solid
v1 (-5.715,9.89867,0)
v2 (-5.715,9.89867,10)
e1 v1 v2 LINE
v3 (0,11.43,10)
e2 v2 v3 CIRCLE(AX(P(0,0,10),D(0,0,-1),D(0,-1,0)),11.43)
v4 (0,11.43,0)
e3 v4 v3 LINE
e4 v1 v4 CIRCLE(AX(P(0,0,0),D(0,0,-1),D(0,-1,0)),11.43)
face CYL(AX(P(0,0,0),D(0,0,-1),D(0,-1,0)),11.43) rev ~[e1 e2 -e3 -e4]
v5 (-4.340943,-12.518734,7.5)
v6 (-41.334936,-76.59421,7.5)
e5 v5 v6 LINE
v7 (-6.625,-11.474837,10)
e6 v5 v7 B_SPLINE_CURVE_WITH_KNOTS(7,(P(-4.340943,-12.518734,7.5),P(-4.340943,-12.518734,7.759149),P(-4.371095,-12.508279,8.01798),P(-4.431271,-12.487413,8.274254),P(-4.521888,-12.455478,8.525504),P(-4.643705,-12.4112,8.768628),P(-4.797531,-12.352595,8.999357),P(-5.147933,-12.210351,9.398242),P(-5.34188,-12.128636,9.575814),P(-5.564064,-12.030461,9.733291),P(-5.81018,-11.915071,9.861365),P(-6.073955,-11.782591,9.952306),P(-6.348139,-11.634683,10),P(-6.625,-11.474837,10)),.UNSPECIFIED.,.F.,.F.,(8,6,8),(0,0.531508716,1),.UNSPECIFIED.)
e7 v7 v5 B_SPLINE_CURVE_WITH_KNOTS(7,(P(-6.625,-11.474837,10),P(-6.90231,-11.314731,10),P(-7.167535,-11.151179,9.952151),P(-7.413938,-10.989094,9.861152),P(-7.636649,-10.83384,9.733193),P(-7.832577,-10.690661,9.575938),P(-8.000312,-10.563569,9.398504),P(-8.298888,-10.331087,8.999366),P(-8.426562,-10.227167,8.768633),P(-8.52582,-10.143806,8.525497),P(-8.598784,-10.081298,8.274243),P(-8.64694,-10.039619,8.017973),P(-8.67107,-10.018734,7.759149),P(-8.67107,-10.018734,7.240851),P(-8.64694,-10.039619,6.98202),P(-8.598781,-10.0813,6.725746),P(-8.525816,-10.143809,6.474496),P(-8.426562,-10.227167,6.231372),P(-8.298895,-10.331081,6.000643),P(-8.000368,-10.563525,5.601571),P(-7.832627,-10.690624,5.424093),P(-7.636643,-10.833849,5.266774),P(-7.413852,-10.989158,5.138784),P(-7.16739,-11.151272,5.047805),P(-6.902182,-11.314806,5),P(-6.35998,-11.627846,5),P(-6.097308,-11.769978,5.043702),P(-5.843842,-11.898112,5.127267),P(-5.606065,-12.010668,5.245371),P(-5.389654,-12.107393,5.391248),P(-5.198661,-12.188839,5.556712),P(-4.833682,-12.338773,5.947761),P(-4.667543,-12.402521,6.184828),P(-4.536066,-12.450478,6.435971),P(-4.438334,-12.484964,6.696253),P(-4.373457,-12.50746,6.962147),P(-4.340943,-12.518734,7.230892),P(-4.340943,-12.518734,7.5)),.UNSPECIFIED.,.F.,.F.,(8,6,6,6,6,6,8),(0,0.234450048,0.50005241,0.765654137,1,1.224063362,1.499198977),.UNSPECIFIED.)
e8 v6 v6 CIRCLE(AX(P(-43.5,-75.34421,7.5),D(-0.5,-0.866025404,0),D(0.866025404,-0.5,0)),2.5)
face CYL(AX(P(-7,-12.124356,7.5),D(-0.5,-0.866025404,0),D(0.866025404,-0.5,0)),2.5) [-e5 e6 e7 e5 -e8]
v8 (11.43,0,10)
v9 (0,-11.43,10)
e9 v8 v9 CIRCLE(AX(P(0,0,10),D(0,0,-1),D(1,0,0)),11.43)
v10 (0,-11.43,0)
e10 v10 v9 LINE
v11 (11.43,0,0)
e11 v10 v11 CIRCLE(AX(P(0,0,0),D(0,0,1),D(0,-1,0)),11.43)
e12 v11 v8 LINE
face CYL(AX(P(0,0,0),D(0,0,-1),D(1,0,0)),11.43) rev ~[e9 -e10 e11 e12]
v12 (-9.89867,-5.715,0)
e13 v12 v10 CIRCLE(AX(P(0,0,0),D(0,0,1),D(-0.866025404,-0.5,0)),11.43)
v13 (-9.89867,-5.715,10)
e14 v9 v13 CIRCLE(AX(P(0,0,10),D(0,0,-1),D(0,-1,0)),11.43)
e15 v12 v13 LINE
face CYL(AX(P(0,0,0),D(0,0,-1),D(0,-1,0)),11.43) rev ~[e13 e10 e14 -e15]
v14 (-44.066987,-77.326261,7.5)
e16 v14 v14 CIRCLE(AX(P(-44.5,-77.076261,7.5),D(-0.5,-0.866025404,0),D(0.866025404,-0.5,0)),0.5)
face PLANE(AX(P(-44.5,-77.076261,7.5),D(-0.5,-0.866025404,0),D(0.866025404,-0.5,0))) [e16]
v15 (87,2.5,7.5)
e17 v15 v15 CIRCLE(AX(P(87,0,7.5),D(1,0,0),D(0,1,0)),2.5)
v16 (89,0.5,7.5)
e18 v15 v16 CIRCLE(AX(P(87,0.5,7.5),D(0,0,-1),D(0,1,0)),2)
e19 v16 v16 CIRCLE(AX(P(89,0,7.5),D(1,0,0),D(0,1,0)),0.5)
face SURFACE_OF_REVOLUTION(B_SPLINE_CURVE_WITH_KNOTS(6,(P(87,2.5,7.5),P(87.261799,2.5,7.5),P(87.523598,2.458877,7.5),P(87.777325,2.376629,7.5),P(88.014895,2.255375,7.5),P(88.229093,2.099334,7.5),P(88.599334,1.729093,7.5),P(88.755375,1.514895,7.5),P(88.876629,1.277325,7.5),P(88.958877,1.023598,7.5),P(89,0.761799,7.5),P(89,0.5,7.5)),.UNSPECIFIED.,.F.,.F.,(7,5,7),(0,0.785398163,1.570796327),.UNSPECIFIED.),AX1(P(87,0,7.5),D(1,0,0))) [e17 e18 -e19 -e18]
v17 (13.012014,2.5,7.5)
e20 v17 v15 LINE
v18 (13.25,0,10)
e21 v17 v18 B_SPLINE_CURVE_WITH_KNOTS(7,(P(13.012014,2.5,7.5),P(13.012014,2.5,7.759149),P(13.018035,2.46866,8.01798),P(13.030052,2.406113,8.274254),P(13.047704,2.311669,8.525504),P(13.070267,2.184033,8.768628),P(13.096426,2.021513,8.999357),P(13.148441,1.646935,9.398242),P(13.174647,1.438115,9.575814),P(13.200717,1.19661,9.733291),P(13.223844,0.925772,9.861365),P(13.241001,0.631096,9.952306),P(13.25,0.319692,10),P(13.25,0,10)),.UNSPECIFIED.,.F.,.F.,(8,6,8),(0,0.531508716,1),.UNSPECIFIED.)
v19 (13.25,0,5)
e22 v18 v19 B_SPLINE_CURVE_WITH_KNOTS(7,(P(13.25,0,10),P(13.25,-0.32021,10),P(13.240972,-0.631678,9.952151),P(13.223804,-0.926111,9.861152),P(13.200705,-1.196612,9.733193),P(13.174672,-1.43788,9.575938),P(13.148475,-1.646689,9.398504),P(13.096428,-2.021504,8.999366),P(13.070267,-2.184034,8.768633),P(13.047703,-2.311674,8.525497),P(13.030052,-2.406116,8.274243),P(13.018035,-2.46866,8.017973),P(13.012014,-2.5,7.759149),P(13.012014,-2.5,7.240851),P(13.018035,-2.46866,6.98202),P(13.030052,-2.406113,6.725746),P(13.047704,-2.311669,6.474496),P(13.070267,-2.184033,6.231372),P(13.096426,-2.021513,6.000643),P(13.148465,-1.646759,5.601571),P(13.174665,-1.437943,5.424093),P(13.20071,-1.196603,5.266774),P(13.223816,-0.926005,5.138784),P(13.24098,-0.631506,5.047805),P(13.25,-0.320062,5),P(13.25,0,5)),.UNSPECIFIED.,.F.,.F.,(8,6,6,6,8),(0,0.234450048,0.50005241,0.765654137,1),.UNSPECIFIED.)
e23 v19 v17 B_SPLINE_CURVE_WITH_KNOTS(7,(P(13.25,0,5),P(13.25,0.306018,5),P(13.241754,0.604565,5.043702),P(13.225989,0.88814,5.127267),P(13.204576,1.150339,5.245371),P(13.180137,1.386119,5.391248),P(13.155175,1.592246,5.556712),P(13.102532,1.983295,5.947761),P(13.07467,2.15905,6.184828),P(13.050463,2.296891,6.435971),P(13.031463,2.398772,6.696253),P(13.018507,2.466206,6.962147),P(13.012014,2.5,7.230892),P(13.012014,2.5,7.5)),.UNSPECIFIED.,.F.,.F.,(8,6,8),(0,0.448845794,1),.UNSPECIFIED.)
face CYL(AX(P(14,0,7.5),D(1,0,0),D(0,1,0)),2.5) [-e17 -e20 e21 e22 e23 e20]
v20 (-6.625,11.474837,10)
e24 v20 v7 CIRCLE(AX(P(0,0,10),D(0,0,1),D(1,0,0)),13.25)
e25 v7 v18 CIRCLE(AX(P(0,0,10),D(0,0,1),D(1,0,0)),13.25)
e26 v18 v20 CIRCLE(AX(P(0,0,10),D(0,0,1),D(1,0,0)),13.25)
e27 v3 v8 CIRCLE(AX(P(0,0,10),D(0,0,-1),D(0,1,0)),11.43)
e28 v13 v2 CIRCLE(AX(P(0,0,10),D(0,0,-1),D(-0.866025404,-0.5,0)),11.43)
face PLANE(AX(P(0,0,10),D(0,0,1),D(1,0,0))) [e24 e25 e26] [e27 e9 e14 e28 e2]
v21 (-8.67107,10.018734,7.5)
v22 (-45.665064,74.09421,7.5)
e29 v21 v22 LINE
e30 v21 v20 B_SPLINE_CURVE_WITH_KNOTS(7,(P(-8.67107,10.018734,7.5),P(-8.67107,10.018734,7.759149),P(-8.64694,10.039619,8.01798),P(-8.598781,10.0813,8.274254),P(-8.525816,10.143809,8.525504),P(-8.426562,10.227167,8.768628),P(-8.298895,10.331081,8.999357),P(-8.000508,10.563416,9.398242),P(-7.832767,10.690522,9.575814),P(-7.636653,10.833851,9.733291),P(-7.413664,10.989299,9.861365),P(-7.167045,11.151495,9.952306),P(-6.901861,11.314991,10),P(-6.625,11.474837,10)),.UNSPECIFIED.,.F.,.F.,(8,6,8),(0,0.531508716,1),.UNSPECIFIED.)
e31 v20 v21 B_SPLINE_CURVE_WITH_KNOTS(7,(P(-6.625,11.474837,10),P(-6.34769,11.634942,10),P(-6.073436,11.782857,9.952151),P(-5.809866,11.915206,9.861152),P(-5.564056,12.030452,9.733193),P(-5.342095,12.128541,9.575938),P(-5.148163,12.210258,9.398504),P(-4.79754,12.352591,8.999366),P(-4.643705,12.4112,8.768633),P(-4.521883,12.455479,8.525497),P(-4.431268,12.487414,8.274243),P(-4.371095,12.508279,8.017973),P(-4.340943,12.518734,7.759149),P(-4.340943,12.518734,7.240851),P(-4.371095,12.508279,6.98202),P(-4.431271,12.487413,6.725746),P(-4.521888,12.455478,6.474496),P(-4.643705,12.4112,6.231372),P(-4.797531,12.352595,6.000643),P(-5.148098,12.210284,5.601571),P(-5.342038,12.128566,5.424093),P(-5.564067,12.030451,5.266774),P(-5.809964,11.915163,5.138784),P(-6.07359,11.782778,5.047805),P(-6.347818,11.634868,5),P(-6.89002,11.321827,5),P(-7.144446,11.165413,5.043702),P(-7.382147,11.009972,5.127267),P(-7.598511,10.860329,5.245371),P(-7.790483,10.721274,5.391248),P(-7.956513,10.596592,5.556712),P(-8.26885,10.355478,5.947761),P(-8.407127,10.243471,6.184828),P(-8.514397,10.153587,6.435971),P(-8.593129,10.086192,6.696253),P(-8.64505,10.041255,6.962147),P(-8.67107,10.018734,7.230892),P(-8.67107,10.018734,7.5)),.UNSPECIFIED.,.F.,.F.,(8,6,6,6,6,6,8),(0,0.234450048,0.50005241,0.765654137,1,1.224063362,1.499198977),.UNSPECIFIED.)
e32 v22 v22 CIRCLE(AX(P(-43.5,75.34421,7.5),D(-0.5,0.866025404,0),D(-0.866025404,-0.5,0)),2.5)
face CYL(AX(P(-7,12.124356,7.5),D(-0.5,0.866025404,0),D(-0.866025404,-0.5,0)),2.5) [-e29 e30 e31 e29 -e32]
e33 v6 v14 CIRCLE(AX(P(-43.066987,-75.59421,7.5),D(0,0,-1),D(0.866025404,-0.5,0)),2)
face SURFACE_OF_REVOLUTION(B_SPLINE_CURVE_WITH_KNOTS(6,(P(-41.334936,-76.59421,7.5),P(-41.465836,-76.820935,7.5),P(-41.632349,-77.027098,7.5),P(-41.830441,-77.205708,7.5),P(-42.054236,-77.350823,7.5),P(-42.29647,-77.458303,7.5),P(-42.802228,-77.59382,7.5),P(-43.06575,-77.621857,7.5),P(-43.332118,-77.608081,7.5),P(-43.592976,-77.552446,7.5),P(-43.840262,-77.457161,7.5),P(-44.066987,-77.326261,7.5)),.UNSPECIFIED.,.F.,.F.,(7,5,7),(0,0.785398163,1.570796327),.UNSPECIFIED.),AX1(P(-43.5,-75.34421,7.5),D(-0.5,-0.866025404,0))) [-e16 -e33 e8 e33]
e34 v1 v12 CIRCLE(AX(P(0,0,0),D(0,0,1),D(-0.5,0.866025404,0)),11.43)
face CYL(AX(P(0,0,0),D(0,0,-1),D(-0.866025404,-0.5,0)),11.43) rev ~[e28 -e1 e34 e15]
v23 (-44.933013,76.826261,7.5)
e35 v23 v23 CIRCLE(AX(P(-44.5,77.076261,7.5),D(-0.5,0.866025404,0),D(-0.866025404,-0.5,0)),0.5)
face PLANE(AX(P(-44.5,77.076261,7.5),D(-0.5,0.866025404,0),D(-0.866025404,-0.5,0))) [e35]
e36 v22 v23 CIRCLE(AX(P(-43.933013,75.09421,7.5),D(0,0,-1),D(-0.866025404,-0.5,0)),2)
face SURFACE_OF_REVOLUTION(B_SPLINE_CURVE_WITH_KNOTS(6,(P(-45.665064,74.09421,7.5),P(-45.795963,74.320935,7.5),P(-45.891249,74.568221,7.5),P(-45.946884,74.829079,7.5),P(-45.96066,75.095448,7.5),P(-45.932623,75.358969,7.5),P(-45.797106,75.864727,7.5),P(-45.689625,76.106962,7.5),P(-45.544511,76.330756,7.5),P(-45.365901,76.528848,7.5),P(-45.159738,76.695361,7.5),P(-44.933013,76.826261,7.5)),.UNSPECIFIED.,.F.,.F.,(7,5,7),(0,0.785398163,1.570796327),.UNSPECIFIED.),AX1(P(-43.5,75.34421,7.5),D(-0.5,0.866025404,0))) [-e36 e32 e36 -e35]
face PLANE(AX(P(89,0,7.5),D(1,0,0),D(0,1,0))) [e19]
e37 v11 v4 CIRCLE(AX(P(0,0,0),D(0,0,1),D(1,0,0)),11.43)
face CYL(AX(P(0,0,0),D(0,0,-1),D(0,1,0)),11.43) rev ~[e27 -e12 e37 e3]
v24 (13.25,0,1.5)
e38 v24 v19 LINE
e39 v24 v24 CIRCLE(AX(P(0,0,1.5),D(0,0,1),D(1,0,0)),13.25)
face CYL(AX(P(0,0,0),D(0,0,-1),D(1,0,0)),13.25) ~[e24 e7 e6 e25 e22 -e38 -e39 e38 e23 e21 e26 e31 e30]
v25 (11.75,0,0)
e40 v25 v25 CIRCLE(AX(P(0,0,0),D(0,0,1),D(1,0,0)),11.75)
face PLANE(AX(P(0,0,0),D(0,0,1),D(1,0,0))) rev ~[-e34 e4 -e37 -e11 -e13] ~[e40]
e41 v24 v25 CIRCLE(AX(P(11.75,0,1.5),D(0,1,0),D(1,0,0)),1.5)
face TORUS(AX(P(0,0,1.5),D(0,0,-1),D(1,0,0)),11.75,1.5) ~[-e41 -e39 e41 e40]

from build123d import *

# Parameters (mm, degrees)
F0_R          = 13.25
F1_DEPTH      = 10
F3_R          = 2.5
F4_DEPTH      = 75
F4_DEPTH_BACK = 2
F5_COUNT      = 3
F6_R          = 1.5
F7_R          = 2
F8_R          = 2


# Not quite as in the source:
# - two fillets or chamfers of one size are made in one step


with BuildPart() as f1:
    # F0 (on Top) → F1 (new body)
    with BuildSketch(Plane.XY):
        Circle(F0_R)
        with BuildLine():
            ThreePointArc((0, 11.43), (8.082230509, 8.082230509), (11.43, 0))
            ThreePointArc((11.43, 0), (8.082230509, -8.082230509), (0, -11.43))
            ThreePointArc((0, -11.43), (-11.43, 0), (0, 11.43))
        make_face(mode=Mode.SUBTRACT)
    extrude(amount=F1_DEPTH)

    # F3 (on offset) → F4 (join, two sides)
    with BuildSketch(Plane.YZ.offset(14)) as f4_sk:
        with Locations((0, 7.5)):
            Circle(F3_R)
    extrude(amount=F4_DEPTH)
    extrude(f4_sk.sketch, amount=-F4_DEPTH_BACK)

    # F5: F1 ×3 about axis
    f5_axis = Axis((0, 0, 10), (0, 0, 1))


with BuildPart() as f1_1:
    add(f1.part)
    for i in range(1, F5_COUNT):
        add(f1.part.rotate(f5_axis, i * 360 / F5_COUNT))

    # F6
    f6_edges = [f1_1.edges().sort_by_distance(p)[0] for p in [
        (-13.25, 0, 0),
    ]]
    fillet(f6_edges, radius=F6_R)

    # F7
    f7_edges = [f1_1.edges().sort_by_distance(p)[0] for p in [
        (89, -2.5, 7.5),
    ]]
    fillet(f7_edges, radius=F7_R)

    # F8
    f8_edges = [f1_1.edges().sort_by_distance(p)[0] for p in [
        (-46.665064, -75.826261, 7.5),
        (-42.334936, 78.326261, 7.5),
    ]]
    fillet(f8_edges, radius=F8_R)


solid = f1_1.part
